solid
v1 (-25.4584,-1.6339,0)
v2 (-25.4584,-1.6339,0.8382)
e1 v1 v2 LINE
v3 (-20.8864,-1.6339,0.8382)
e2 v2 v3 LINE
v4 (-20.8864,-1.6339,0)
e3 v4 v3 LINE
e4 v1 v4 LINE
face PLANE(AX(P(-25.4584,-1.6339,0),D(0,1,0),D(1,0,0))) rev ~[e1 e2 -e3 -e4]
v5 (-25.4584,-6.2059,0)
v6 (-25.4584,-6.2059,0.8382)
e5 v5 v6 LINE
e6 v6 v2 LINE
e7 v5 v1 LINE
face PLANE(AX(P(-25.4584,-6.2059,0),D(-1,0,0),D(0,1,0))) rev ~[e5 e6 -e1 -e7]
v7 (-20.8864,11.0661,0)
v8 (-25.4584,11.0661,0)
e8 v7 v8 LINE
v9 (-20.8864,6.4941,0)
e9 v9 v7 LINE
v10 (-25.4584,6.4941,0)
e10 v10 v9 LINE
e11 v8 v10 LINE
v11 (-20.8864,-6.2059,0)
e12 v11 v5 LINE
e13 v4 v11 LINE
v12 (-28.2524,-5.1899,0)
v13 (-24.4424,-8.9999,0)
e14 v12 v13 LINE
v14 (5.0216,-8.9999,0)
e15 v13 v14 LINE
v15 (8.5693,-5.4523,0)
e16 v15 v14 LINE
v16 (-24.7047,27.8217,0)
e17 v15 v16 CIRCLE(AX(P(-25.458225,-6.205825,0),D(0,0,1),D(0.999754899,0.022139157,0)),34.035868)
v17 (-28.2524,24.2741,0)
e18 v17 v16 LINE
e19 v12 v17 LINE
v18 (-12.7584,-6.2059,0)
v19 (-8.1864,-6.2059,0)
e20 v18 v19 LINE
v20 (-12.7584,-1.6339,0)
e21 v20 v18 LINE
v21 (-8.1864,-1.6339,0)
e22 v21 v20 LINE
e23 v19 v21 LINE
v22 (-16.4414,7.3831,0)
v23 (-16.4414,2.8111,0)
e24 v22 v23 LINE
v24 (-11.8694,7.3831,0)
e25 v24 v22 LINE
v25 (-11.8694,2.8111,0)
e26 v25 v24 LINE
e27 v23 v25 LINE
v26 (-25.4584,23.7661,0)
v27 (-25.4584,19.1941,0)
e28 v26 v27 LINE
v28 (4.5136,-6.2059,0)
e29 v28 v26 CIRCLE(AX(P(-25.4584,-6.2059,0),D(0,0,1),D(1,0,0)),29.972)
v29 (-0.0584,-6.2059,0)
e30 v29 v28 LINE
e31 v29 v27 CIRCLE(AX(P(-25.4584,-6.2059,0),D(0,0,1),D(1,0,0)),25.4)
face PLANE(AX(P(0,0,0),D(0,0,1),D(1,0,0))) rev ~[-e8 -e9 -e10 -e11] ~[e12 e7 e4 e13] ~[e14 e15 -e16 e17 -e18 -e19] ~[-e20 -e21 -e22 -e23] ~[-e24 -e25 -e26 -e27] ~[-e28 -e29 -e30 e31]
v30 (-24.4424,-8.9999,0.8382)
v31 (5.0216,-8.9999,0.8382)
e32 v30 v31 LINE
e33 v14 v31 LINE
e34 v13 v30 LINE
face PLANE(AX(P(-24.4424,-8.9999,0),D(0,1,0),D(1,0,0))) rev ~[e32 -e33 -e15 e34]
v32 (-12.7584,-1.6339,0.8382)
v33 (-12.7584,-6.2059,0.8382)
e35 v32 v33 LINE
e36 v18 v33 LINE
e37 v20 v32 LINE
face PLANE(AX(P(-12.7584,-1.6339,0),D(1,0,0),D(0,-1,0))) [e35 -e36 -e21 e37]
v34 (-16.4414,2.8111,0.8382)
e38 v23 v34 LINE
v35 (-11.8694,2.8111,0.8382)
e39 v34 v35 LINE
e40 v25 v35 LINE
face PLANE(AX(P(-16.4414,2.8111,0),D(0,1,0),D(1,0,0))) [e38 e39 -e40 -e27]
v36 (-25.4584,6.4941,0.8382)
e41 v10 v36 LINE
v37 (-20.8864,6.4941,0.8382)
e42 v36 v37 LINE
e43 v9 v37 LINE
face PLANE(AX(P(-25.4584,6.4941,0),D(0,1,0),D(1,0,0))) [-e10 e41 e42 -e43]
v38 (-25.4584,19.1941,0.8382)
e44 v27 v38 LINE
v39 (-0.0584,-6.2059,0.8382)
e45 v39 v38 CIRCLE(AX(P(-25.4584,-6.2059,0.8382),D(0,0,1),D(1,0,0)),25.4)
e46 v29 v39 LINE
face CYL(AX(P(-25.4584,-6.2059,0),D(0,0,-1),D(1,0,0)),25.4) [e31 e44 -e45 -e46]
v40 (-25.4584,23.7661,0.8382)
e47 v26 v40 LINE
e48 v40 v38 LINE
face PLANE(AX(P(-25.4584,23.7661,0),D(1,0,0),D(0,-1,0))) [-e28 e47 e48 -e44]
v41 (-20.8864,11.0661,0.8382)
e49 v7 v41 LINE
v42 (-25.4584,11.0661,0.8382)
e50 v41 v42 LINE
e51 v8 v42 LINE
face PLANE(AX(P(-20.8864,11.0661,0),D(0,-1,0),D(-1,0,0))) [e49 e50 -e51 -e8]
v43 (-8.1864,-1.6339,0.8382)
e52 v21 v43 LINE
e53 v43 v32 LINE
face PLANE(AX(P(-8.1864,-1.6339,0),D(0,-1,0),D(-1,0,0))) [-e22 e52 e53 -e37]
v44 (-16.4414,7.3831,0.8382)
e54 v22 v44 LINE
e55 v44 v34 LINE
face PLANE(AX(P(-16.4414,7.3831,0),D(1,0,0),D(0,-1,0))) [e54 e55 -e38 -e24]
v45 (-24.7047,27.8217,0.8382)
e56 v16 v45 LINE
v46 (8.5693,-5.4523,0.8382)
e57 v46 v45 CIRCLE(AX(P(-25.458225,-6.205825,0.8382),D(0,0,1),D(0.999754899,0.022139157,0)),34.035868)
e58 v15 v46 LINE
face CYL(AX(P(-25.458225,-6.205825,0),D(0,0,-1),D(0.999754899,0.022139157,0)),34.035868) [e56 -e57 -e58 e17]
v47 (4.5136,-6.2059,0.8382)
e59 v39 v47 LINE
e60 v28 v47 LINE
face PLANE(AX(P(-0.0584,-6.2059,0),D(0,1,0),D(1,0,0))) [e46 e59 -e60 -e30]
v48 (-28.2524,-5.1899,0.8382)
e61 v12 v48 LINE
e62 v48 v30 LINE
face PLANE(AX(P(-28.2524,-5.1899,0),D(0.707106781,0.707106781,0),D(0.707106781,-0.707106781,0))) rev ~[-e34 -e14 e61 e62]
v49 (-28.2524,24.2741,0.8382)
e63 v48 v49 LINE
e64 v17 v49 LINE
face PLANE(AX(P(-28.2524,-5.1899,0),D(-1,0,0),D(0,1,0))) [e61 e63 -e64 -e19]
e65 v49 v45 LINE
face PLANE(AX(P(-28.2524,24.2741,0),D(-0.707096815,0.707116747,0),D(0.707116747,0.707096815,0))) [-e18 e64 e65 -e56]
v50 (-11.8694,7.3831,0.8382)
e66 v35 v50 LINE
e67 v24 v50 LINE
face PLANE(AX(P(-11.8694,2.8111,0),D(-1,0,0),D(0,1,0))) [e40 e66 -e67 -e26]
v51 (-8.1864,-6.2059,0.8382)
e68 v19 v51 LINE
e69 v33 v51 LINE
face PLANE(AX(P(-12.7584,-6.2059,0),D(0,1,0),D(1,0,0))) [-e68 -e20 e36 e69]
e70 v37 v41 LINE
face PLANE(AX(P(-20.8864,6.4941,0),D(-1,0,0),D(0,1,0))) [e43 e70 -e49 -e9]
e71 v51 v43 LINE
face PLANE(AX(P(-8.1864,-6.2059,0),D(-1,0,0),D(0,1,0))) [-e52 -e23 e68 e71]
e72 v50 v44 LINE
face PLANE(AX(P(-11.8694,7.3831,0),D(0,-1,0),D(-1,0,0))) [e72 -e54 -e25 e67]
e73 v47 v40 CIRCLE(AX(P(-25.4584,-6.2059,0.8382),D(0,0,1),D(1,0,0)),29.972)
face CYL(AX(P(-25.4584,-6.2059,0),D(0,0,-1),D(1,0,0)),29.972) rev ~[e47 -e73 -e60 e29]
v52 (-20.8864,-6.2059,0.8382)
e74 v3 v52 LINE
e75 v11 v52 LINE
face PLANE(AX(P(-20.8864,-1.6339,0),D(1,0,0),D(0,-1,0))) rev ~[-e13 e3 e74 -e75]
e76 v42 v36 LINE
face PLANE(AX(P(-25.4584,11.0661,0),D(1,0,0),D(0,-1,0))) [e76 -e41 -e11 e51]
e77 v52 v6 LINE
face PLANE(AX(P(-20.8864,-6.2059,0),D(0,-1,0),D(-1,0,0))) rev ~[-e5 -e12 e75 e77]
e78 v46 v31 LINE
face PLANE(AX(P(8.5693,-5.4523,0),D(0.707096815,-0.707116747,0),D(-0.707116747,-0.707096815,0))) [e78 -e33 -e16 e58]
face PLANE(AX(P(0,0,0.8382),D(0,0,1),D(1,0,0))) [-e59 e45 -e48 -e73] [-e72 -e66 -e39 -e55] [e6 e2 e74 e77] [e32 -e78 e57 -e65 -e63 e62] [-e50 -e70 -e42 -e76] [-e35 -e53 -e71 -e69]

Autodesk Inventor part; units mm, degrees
ref_plane "YZ Plane" through (0, 0, 0) normal (1, 0, 0) x (0, 1, 0)
ref_plane "XZ Plane" through (0, 0, 0) normal (0, 1, 0) x (-1, 0, 0)
ref_plane "XY Plane" through (0, 0, 0) normal (0, 0, 1) x (1, 0, 0)
sketch "Sketch1" plane through (0, 0, 0) normal (0, 0, 1) x (1, 0, 0)
  line L0 (-25.4584, -1.6339) -> (-20.8864, -1.6339)
  line L1 (-20.8864, -1.6339) -> (-20.8864, -6.2059)
  line L2 (-20.8864, -6.2059) -> (-25.4584, -6.2059)
  line L3 (-25.4584, -6.2059) -> (-25.4584, -1.6339)
  line L4 (-12.7584, -6.2059) -> (-8.1864, -6.2059)
  line L5 (-8.1864, -6.2059) -> (-8.1864, -1.6339)
  line L6 (-8.1864, -1.6339) -> (-12.7584, -1.6339)
  line L7 (-12.7584, -1.6339) -> (-12.7584, -6.2059)
  line L8 (-0.0584, -6.2059) -> (4.5136, -6.2059)
  line L9 (-25.4584, 6.4941) -> (-20.8864, 6.4941)
  line L10 (-20.8864, 6.4941) -> (-20.8864, 11.0661)
  line L11 (-20.8864, 11.0661) -> (-25.4584, 11.0661)
  line L12 (-25.4584, 11.0661) -> (-25.4584, 6.4941)
  line L13 (-25.4584, 23.7661) -> (-25.4584, 19.1941)
  line L14 (-24.4424, -8.9999) -> (5.0216, -8.9999)
  line L15 (-28.2524, -5.1899) -> (-28.2524, 24.2741)
  arc A0 (-0.0584, -6.2059) -> (-25.4584, 19.1941) centre (-25.4584, -6.2059) ccw
  arc A1 (4.5136, -6.2059) -> (-25.4584, 23.7661) centre (-25.4584, -6.2059) ccw
  arc A2 (8.5693, -5.4523) -> (-24.7047, 27.8217) centre (-25.4584, -6.2059) ccw
  line L16 (-28.2524, -5.1899) -> (-24.4424, -8.9999)
  line L17 (-24.4424, -8.9999) -> (-28.2524, -5.1899)
  line L18 (-28.2524, 24.2741) -> (-24.7047, 27.8217)
  line L19 (8.5693, -5.4523) -> (5.0216, -8.9999)
  line L20 (-16.4414, 2.8111) -> (-11.8694, 2.8111)
  line L21 (-11.8694, 2.8111) -> (-11.8694, 7.3831)
  line L22 (-11.8694, 7.3831) -> (-16.4414, 7.3831)
  line L23 (-16.4414, 7.3831) -> (-16.4414, 2.8111)
  point P0 (-28.2524, -8.9999)
  point P1 (-28.2524, -8.9999)
  dimension "d0" = 4.572
  dimension "d1" = 4.572
  dimension "d2" = 4.572
  dimension "d3" = 4.572
  dimension "d4" = 4.572
  dimension "d5" = 4.572
  dimension "d6" = 8.128
  dimension "d8" = 8.128
  dimension "d10" = 4.064
  dimension "d11" = 2.794
  dimension "d12" = 2.794
  dimension "d13" = 3.81
  dimension "d14" = 3.81
  dimension "d15" = 3.81
  dimension "d16" = 3.81
  dimension "d18" = 45
  dimension "d22" = 4.572
  dimension "d23" = 4.445
  dimension "d24" = 4.445
  dimension "d25" = 4.572
extrude "Extrusion1" add sketch "Sketch1" along normal blind 0.8382
sketch "Sketch2" plane through (0, 0, 0.8382) normal (0, 0, 1) x (1, 0, 0)
  line L0 (-20.8864, -1.6339) -> (-20.8864, -6.2059) projected
  line L1 (-20.8864, -6.2059) -> (-25.4584, -6.2059) projected
  line L2 (-25.4584, -6.2059) -> (-25.4584, -1.6339) projected
  line L3 (-25.4584, -1.6339) -> (-20.8864, -1.6339) projected
  circle A0 centre (-23.1724, -3.9199) radius 2.286
  point P0 (0, 0)
surface extrude "ExtrusionSrf1" sketch "Sketch2" against normal up to surface (0.8382 mm away) shown no curves A0
pattern_linear "Rectangular Pattern1" count 2 spacing 12.7 along (1, 0, 0) of "ExtrusionSrf1"
pattern_linear "Rectangular Pattern2" count 2 spacing 12.7 along (0, 1, 0) of "ExtrusionSrf1"
sketch "Sketch3" plane through (0, 0, 0.8382) normal (0, 0, 1) x (1, 0, 0)
  line L0 (-16.4414, 2.8111) -> (-16.4414, 7.3831) projected
  line L1 (-16.4414, 7.3831) -> (-11.8694, 7.3831) projected
  line L2 (-11.8694, 7.3831) -> (-11.8694, 2.8111) projected
  line L3 (-11.8694, 2.8111) -> (-16.4414, 2.8111) projected
  circle A0 centre (-14.1554, 5.0971) radius 2.286
  point P0 (0, 0)
surface extrude "ExtrusionSrf4" sketch "Sketch3" against normal up to surface (0.8382 mm away) shown no curves A0
sketch "Sketch4" plane through (0, 0, 0.8382) normal (0, 0, 1) x (1, 0, 0)
  arc A0 (-0.0584, -6.2059) -> (-25.4584, 19.1941) centre (-25.4584, -6.2059) ccw projected
  line L0 (-25.4584, 19.1941) -> (-25.4584, 23.7661) projected
  arc A1 (4.5136, -6.2059) -> (-25.4584, 23.7661) centre (-25.4584, -6.2059) ccw projected
  circle A2 centre (-23.1724, 21.3855) radius 2.286
  point P0 (0, 0)
surface extrude "ExtrusionSrf5" sketch "Sketch4" against normal up to surface (0.8382 mm away) shown no curves A2
sketch "Sketch5" plane through (0, 0, 0.8382) normal (0, 0, 1) x (1, 0, 0)
  arc A0 (-0.0584, -6.2059) -> (-25.4584, 19.1941) centre (-25.4584, -6.2059) ccw projected
  arc A1 (4.5136, -6.2059) -> (-25.4584, 23.7661) centre (-25.4584, -6.2059) ccw projected
  line L0 (4.5136, -6.2059) -> (-0.0584, -6.2059) projected
  circle A2 centre (2.1331, -3.9199) radius 2.286
  point P0 (0, 0)
surface extrude "ExtrusionSrf6" sketch "Sketch5" against normal up to surface (0.8382 mm away) shown no curves A2
equation "\"d14\" = d13"
equation "\"d15\" = d13"
equation "\"d16\" = d15"
properties part number "275-1062" material "Steel"
